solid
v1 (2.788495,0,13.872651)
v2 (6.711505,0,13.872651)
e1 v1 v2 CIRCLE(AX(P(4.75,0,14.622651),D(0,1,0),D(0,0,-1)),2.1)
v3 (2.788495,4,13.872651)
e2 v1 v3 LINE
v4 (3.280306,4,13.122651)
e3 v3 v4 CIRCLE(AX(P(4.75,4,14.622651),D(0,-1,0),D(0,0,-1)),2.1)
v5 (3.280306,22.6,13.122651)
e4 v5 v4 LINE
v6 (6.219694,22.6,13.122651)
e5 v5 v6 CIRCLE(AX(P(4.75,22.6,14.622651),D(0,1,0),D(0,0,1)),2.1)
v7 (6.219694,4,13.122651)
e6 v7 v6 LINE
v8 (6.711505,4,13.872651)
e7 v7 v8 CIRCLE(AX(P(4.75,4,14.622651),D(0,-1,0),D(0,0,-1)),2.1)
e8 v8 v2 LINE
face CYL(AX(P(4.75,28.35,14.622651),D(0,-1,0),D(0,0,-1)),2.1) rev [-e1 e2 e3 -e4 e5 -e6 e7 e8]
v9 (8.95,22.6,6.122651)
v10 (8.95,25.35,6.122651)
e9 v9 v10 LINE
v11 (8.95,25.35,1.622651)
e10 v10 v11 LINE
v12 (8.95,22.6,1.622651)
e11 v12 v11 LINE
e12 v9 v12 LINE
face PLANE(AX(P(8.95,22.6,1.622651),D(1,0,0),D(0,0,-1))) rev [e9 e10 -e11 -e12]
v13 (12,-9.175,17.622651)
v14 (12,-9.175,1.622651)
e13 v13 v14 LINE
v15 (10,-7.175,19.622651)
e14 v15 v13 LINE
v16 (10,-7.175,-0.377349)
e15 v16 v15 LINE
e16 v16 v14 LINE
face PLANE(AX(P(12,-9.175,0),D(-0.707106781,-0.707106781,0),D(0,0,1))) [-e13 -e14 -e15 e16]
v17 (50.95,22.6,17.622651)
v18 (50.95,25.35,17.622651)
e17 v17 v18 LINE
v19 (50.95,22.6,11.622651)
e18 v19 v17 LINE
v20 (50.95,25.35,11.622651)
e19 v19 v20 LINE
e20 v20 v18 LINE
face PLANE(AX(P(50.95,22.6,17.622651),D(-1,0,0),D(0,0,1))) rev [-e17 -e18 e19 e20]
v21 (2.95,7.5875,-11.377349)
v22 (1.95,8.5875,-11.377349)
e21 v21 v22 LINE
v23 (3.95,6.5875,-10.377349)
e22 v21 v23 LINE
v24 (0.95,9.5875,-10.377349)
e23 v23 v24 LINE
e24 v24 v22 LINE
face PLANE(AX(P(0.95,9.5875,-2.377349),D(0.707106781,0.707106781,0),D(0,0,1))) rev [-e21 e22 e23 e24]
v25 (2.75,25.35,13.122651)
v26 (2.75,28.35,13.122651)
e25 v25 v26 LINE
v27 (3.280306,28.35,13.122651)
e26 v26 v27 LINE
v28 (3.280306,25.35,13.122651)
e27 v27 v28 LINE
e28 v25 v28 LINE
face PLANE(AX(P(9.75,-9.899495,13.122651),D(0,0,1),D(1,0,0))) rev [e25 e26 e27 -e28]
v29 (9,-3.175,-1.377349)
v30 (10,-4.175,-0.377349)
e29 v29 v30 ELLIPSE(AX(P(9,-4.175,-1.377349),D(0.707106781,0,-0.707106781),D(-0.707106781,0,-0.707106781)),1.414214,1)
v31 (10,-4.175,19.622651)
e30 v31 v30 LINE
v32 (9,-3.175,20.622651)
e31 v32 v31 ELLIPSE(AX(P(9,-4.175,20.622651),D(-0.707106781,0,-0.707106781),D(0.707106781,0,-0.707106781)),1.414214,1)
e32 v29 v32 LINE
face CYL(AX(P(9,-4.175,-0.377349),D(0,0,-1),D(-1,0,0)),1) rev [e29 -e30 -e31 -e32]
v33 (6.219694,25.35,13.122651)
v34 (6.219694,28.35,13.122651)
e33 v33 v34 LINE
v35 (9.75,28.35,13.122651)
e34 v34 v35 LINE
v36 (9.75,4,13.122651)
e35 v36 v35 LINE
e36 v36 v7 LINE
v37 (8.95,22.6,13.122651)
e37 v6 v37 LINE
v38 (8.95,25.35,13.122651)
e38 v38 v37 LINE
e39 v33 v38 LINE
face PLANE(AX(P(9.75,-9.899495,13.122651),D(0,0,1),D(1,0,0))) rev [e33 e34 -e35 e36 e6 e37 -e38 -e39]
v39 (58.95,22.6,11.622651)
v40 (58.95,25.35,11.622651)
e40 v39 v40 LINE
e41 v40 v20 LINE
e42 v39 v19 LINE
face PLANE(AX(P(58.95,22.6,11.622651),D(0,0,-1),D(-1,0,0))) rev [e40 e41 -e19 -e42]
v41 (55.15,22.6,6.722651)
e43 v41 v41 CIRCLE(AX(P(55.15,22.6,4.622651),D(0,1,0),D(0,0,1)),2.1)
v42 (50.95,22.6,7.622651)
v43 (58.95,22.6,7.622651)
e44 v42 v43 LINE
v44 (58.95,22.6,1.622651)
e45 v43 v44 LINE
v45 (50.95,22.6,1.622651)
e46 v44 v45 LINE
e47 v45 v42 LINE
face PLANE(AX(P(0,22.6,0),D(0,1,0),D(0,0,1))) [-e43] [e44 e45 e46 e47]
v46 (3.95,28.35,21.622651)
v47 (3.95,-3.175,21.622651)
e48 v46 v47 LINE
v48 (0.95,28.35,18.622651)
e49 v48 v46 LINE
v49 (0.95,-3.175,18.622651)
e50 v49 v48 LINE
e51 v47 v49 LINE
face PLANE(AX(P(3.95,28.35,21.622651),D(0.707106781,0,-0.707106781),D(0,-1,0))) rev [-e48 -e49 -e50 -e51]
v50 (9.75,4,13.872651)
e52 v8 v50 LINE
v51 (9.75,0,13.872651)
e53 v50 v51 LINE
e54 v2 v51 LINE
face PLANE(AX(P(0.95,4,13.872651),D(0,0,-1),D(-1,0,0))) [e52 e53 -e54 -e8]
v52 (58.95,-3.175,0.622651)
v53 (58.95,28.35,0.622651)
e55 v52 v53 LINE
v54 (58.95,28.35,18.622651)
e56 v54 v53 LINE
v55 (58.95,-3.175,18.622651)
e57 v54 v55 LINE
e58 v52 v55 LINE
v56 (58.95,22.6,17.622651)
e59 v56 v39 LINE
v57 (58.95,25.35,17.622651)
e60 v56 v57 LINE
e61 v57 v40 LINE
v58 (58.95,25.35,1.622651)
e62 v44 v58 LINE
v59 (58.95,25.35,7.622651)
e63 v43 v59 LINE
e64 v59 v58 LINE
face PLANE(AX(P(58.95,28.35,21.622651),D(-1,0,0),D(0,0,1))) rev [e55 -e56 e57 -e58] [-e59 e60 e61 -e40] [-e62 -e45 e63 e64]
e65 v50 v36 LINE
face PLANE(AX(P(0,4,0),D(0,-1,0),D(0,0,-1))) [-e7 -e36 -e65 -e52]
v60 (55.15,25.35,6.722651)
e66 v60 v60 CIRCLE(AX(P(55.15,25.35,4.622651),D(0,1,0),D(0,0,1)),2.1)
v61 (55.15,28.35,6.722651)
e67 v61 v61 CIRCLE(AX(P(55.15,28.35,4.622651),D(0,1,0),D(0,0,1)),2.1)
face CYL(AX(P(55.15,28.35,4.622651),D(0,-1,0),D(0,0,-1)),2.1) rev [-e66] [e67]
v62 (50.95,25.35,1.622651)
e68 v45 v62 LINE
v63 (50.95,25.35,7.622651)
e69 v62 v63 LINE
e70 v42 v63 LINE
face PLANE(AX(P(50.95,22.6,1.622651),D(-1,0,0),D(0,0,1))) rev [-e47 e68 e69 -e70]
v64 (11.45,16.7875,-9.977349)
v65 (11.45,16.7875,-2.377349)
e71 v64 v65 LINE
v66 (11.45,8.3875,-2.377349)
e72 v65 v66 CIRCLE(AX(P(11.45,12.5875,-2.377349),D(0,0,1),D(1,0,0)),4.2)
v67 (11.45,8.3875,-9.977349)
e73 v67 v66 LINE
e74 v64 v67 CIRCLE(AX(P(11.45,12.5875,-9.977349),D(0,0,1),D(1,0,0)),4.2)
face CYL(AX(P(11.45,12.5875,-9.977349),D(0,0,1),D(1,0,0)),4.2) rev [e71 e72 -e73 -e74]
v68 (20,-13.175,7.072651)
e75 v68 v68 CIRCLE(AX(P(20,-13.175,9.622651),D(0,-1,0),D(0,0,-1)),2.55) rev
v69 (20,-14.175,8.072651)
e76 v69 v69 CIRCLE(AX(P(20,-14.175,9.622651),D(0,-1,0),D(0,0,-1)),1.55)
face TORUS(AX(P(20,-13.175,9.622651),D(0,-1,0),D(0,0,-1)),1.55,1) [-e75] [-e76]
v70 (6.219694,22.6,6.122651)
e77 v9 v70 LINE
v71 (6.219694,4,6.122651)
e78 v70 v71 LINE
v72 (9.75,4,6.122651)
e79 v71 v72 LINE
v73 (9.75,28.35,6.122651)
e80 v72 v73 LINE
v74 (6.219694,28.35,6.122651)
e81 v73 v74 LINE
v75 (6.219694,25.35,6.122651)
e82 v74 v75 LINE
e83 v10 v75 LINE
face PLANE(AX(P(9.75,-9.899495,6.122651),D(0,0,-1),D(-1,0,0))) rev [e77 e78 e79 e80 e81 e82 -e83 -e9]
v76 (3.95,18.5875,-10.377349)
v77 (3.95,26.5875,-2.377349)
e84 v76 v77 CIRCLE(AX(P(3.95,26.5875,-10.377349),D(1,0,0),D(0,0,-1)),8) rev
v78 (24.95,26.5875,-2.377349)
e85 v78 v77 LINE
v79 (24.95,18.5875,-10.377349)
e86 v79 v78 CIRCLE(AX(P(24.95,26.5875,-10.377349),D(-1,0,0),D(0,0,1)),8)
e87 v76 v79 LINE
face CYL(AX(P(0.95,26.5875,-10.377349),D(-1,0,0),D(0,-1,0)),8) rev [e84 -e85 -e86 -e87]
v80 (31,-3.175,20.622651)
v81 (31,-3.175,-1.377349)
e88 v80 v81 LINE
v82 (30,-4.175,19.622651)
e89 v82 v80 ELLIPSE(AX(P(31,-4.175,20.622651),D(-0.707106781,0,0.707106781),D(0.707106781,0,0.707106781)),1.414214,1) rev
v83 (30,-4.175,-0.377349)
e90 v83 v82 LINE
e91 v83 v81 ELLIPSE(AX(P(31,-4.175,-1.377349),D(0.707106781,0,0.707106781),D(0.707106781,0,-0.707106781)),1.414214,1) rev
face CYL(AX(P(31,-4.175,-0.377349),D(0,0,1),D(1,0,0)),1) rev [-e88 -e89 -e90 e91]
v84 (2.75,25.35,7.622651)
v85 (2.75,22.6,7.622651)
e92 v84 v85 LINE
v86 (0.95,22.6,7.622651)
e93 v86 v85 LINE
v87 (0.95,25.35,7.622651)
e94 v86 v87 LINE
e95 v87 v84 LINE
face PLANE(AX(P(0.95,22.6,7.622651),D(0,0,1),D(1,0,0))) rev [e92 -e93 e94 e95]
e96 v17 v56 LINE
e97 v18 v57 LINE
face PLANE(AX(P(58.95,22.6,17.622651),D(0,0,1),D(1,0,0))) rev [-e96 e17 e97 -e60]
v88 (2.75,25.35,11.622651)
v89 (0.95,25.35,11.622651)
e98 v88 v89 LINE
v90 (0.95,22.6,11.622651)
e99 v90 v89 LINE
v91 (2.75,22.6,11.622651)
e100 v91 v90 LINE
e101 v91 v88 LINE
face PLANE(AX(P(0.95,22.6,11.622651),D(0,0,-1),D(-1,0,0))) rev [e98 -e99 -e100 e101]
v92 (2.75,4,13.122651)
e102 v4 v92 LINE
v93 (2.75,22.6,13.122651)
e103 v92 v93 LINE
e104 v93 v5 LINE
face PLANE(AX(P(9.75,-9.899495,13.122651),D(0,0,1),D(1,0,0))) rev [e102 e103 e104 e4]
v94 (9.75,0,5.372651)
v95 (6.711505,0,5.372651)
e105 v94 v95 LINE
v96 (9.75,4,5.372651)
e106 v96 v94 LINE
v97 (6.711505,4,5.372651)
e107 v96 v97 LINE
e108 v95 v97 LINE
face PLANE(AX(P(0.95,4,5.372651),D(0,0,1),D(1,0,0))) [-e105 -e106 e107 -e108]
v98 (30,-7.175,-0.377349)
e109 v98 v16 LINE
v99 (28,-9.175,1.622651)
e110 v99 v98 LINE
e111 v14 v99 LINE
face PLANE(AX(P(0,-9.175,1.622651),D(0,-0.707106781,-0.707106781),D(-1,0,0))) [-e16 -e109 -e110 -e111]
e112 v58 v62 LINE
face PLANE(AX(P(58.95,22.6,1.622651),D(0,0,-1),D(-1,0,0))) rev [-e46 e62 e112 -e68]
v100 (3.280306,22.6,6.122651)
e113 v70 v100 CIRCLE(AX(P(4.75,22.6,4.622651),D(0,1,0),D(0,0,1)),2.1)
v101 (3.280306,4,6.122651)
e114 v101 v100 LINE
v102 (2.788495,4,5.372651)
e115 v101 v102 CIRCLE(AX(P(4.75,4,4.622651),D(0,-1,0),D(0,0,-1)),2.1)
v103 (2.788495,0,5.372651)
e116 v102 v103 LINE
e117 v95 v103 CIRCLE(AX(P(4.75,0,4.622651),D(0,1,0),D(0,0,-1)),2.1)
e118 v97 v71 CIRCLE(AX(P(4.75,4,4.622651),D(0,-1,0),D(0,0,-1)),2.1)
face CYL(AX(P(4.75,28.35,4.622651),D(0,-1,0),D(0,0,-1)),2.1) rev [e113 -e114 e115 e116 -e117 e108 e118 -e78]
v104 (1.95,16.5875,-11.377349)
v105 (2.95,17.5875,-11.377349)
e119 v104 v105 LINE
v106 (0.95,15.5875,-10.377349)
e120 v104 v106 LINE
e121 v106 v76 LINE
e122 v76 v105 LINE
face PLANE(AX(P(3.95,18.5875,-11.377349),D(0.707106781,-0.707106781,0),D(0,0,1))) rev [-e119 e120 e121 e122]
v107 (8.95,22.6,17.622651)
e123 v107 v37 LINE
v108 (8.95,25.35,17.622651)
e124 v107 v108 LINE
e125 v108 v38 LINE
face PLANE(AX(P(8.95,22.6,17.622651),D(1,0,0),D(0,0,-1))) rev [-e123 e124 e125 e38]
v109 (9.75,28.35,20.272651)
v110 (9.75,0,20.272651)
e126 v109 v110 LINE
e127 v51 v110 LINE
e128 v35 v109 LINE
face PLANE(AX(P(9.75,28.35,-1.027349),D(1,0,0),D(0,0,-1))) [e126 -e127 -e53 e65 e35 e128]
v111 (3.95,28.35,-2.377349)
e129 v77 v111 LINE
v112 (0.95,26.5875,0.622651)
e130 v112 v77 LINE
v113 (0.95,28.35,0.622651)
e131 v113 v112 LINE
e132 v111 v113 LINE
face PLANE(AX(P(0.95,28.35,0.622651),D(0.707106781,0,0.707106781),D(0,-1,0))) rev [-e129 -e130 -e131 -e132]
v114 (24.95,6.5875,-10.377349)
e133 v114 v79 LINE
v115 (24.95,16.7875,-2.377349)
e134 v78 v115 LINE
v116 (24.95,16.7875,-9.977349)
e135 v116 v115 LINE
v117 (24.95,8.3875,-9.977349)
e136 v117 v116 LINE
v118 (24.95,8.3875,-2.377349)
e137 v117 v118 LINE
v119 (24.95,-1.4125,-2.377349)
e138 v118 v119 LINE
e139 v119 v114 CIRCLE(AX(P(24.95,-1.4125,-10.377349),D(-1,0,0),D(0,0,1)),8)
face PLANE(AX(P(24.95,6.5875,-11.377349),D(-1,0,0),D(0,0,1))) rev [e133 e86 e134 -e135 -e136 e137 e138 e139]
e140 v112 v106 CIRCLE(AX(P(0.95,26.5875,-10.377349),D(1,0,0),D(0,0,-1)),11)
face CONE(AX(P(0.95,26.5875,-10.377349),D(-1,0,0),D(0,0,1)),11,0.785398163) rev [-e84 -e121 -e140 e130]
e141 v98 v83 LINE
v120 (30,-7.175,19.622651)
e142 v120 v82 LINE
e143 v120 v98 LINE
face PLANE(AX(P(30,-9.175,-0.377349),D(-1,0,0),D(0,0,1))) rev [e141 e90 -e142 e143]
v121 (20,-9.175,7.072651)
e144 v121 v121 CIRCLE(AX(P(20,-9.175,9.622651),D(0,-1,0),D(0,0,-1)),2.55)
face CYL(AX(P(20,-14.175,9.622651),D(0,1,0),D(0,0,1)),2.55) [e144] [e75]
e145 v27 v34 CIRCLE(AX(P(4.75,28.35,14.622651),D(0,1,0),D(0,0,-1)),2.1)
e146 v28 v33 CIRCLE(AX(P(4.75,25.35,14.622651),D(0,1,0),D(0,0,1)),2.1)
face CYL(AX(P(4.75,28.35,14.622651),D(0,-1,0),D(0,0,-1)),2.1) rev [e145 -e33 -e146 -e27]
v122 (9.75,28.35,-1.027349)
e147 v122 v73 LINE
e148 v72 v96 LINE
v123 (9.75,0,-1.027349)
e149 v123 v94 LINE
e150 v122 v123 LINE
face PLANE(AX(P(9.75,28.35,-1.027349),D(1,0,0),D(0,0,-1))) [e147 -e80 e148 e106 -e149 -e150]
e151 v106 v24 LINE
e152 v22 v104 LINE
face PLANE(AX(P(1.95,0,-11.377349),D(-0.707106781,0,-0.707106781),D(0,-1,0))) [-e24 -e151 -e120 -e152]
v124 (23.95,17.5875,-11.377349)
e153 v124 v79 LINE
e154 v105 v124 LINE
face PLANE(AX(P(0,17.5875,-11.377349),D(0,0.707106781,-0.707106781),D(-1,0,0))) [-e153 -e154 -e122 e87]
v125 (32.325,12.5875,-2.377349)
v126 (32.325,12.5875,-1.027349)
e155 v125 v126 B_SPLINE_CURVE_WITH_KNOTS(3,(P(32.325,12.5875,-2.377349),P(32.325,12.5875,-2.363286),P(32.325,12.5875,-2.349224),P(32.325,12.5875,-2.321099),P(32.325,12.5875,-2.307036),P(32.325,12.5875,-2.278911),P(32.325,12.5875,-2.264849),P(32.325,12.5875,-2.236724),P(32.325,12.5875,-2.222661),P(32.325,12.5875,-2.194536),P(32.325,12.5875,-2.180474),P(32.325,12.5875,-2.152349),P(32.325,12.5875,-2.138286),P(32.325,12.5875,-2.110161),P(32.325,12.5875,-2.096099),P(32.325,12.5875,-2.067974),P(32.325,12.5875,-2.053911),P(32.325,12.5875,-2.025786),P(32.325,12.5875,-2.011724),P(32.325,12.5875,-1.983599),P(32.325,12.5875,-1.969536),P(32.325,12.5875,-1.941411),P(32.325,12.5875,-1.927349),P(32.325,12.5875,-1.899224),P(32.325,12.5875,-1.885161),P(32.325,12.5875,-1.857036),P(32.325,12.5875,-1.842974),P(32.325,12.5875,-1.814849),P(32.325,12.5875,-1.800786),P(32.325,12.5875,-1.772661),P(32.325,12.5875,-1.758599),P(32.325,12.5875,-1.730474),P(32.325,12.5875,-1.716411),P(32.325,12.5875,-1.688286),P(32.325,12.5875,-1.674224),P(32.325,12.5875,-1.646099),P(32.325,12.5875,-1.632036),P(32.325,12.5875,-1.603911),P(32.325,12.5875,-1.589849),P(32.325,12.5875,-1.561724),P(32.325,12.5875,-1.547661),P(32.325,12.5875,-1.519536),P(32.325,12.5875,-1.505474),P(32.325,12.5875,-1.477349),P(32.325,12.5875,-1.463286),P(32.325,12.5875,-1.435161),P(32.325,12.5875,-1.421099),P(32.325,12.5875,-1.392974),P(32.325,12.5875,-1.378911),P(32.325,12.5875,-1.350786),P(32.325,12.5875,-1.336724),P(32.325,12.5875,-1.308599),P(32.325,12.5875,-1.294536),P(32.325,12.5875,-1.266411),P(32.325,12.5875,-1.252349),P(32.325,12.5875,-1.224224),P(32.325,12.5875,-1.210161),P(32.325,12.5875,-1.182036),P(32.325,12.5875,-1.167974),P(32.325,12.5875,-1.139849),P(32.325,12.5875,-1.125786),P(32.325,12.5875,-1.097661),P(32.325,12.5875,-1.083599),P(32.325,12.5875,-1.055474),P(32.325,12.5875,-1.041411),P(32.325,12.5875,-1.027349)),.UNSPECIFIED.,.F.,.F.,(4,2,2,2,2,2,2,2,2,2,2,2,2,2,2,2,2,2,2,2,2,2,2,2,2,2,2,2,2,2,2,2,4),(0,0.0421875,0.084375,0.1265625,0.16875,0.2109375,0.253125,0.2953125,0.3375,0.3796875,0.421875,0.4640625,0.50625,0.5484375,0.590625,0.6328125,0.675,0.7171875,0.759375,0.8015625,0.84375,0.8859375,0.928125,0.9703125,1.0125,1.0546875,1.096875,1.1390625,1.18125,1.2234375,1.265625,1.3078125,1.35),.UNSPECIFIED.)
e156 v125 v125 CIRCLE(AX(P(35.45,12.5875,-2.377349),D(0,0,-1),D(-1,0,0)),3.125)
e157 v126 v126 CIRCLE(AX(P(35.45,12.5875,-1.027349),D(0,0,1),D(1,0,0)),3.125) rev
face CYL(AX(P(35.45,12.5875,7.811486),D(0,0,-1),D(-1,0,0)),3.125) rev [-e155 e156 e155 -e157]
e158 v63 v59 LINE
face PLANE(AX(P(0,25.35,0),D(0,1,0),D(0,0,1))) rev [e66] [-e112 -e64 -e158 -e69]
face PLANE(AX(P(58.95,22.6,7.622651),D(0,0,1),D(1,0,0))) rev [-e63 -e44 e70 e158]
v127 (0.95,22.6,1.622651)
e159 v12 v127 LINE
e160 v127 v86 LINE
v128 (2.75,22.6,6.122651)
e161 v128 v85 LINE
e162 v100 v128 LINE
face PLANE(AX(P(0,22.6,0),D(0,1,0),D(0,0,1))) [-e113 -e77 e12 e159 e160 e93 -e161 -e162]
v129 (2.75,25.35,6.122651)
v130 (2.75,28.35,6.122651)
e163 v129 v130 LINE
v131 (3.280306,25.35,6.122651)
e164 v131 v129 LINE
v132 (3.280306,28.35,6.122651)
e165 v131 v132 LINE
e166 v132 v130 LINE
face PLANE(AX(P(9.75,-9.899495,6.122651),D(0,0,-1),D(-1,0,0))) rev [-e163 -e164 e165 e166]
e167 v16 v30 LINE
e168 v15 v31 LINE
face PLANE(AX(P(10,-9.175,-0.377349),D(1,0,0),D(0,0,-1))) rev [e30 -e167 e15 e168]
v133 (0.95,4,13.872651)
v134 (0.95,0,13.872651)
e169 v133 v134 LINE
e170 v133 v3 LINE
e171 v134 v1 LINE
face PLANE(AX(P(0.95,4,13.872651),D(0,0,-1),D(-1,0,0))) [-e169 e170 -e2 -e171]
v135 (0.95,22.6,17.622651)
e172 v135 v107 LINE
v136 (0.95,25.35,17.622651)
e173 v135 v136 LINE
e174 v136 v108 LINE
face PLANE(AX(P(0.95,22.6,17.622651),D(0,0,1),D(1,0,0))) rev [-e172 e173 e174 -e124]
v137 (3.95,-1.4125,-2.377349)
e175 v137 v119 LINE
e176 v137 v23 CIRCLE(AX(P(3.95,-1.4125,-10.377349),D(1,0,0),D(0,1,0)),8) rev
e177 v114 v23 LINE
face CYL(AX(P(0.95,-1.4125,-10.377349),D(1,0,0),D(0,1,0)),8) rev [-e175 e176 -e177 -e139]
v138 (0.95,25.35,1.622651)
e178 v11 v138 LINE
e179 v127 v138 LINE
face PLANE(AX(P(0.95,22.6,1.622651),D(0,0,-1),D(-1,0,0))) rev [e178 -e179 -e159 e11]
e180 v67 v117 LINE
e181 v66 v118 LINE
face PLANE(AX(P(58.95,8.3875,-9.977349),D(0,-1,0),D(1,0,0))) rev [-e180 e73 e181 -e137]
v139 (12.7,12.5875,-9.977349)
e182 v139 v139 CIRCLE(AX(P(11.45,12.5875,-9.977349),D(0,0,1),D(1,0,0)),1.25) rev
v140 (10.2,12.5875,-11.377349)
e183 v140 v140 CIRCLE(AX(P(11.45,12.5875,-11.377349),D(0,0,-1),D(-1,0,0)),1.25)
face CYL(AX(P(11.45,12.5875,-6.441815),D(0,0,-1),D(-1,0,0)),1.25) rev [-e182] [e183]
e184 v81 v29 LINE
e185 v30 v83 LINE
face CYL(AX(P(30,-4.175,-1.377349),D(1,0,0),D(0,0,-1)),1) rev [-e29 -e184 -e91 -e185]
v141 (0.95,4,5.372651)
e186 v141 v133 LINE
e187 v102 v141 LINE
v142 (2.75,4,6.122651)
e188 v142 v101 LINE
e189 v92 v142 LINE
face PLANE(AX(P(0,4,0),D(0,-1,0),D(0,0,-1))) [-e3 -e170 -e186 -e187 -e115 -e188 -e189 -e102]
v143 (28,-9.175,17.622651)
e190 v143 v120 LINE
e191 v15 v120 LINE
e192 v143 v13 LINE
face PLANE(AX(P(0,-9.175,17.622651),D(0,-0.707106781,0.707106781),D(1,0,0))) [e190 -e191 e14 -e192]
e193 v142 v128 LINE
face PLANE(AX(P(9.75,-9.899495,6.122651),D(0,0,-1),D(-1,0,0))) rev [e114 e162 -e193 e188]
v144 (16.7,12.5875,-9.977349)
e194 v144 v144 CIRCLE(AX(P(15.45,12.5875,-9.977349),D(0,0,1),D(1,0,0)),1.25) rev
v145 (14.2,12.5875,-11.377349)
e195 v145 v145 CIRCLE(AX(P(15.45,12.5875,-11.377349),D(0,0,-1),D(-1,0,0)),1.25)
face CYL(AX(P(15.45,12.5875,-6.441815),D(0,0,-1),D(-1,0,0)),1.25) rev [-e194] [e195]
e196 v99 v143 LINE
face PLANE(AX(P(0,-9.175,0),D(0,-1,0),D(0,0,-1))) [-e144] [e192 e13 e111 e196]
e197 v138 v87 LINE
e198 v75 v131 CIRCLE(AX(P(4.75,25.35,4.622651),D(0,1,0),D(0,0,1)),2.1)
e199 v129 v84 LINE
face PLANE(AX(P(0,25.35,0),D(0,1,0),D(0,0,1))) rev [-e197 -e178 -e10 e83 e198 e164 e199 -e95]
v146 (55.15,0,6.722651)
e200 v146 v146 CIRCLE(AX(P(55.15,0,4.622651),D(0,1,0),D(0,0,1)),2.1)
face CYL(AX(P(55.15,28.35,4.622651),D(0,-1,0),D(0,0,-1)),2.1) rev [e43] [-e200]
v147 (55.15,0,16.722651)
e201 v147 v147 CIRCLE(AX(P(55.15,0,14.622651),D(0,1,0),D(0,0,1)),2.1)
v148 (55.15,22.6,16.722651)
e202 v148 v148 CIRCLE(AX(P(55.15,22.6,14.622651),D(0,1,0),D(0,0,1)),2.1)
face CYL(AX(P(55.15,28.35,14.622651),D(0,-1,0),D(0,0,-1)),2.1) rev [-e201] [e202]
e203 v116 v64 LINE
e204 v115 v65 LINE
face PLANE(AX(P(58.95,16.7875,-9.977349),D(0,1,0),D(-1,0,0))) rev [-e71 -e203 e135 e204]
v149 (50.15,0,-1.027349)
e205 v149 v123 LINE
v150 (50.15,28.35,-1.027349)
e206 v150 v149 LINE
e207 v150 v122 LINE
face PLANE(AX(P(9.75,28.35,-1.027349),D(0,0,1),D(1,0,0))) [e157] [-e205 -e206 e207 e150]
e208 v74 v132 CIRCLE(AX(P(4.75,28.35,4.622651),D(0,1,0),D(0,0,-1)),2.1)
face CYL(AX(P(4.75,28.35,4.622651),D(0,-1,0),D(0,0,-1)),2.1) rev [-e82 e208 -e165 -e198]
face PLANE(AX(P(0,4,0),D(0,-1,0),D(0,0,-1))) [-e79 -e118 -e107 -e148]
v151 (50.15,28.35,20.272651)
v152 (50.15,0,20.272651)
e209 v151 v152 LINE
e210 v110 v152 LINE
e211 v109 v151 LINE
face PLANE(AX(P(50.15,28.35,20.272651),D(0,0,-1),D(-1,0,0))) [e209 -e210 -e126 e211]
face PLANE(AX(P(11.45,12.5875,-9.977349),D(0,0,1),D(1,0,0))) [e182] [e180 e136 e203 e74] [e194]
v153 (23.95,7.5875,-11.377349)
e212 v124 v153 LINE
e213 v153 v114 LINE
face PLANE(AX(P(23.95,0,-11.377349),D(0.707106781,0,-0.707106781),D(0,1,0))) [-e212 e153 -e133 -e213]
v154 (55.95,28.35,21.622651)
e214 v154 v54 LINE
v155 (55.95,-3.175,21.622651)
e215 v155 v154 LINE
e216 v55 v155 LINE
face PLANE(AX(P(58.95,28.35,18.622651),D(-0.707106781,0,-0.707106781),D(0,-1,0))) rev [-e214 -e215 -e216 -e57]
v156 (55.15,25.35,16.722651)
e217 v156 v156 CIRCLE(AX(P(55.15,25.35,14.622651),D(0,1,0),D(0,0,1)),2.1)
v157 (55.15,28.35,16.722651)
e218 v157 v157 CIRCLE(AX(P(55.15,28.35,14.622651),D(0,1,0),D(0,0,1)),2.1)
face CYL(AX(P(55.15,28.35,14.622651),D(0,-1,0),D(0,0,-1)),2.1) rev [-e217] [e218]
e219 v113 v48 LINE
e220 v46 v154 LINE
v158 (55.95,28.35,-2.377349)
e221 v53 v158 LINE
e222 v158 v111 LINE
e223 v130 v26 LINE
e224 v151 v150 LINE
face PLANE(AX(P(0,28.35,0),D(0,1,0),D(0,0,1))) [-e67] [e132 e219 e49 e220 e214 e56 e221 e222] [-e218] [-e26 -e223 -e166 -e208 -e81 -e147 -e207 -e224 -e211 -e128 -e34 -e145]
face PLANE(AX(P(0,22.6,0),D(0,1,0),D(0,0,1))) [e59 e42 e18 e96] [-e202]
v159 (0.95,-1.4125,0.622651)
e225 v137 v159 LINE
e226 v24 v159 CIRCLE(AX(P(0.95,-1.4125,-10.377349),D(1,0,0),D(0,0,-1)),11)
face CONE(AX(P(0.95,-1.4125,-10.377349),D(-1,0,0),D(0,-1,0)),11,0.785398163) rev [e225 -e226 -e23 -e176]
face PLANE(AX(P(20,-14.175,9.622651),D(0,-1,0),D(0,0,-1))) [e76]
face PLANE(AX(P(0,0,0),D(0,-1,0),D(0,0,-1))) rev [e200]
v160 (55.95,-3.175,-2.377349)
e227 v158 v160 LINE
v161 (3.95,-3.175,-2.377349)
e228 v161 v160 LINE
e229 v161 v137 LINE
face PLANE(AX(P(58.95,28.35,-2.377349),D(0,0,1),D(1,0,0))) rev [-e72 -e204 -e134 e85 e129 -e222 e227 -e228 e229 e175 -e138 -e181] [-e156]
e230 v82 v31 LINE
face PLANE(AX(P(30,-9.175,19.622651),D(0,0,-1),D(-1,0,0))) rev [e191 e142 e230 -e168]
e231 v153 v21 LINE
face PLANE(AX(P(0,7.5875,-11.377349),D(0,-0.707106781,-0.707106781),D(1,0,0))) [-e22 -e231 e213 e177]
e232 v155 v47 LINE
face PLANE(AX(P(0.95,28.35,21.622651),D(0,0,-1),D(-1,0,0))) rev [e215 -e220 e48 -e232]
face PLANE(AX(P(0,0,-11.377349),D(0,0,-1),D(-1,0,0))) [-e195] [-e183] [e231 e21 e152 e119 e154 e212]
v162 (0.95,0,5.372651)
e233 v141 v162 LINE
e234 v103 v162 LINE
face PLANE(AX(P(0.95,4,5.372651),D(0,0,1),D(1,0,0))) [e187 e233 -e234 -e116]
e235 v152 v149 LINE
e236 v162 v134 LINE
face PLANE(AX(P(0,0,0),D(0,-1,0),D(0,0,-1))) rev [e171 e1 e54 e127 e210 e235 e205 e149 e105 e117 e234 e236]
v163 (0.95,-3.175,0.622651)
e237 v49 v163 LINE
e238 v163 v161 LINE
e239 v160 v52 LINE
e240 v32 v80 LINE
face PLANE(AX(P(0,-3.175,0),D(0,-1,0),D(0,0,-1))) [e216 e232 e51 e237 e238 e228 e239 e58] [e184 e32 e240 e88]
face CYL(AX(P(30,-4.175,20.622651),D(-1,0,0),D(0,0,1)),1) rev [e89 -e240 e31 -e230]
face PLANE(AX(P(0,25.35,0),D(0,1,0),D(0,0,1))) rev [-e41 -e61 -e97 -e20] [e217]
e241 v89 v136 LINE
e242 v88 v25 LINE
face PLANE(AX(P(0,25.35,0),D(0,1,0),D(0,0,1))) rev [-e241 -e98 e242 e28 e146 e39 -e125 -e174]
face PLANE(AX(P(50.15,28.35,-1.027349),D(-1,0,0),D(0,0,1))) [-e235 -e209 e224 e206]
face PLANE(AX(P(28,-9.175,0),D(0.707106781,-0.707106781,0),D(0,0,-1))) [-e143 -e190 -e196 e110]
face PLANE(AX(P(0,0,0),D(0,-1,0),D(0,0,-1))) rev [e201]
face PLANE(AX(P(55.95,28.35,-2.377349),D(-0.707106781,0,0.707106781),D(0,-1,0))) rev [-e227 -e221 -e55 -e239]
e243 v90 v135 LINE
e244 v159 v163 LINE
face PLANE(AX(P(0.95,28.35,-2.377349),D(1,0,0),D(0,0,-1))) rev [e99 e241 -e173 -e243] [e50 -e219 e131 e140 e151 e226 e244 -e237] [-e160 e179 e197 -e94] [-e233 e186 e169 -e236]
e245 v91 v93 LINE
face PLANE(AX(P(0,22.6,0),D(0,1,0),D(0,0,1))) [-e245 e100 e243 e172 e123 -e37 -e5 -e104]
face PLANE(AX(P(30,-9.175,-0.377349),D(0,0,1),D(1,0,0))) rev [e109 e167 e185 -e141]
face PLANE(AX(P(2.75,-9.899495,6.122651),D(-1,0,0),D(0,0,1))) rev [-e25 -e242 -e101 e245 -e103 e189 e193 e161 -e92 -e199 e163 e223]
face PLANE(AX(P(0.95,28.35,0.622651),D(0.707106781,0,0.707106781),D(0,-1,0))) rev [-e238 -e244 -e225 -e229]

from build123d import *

# Parameters (mm, degrees)
SKETCH1_W           = 58
SKETCH1_H           = 24
SKETCH1_R           = 2.1
SKETCH1_W_2         = 40.4
SKETCH1_H_2         = 21.3
BOSS_EXTRUDE1_DEPTH = 28.35
SKETCH11_W          = 58
SKETCH11_H          = 24
BOSS_EXTRUDE5_DEPTH = 3.175
SKETCH14_W          = 24
SKETCH14_H          = 12
BOSS_EXTRUDE7_DEPTH = 9
CUT_EXTRUDE1_START  = -4.5
CUT_EXTRUDE1_DEPTH  = 7.6
FILLET1_R           = 8
CHAMFER2_SIZE       = 3
CHAMFER3_SIZE       = 1
SKETCH19_W          = 8
SKETCH19_H          = 6
CUT_EXTRUDE3_DEPTH  = 2.75
SKETCH20_W          = 8.8
SKETCH20_H          = 8.5
CUT_EXTRUDE4_DEPTH  = 4
SKETCH21_W          = 20
SKETCH21_H          = 20
BOSS_EXTRUDE8_DEPTH = 6
SKETCH13_R          = 2.55
BOSS_EXTRUDE6_DEPTH = 5
FILLET4_R           = 1
CHAMFER4_SIZE       = 2
FILLET5_R           = 1
CUT_EXTRUDE5_REACH  = 77.835
SKETCH22_W          = 7
SKETCH22_H          = 7
CUT_EXTRUDE6_DEPTH  = 1.4
SKETCH24_R          = 3.125
CUT_EXTRUDE7_DEPTH  = 1.35


with BuildPart() as part:
    # Sketch1 → Boss-Extrude1 (new body)
    with BuildSketch(Plane(origin=(0, 0, 0), x_dir=(1, 0, 0), z_dir=(0, 1, 0))):
        with Locations((29.95, -9.622651473)):
            Rectangle(SKETCH1_W, SKETCH1_H)
        with Locations(Location((55.15, -4.622651473, 0), (0, 0, 270))):
            Circle(SKETCH1_R, mode=Mode.SUBTRACT)
        with Locations(Location((55.15, -14.622651473, 0), (0, 0, 270))):
            Circle(SKETCH1_R, mode=Mode.SUBTRACT)
        with Locations(Location((4.75, -14.622651473, 0), (0, 0, 90))):
            Circle(SKETCH1_R, mode=Mode.SUBTRACT)
        with Locations(Location((4.75, -4.622651473, 0), (0, 0, 90))):
            Circle(SKETCH1_R, mode=Mode.SUBTRACT)
        with Locations((29.95, -9.622651473)):
            Rectangle(SKETCH1_W_2, SKETCH1_H_2, mode=Mode.SUBTRACT)
    extrude(amount=BOSS_EXTRUDE1_DEPTH)

    # Sketch11 → Boss-Extrude5 (add)
    with BuildSketch(Plane.XZ):
        with Locations((29.95, 9.622651473)):
            Rectangle(SKETCH11_W, SKETCH11_H)
    extrude(amount=BOSS_EXTRUDE5_DEPTH)

    # Sketch14 → Boss-Extrude7 (add)
    with BuildSketch(Plane(origin=(0, 0, -2.377348527), x_dir=(-1, 0, 0), z_dir=(0, 0, -1))):
        with Locations((-12.95, 12.5875)):
            Rectangle(SKETCH14_W, SKETCH14_H)
    extrude(amount=BOSS_EXTRUDE7_DEPTH)

    # Sketch16 → Cut-Extrude1 (cut)
    with BuildSketch(Plane(origin=(0, 0, -6.877348527), x_dir=(-1, 0, 0), z_dir=(0, 0, -1)).offset(CUT_EXTRUDE1_START)):
        with BuildLine():
            Line((-11.45, 16.7875), (-24.95, 16.7875))
            Line((-24.95, 16.7875), (-24.95, 8.3875))
            Line((-24.95, 8.3875), (-11.45, 8.3875))
            ThreePointArc((-11.45, 8.3875), (-7.25, 12.5875), (-11.45, 16.7875))
        make_face()
    extrude(amount=CUT_EXTRUDE1_DEPTH, mode=Mode.SUBTRACT)

    # Fillet1
    fillet1_edges = [part.edges().sort_by_distance(p)[0] for p in [
        (12.95, 6.5875, -2.377348527),
        (12.95, 18.5875, -2.377348527),
    ]]
    fillet(fillet1_edges, radius=FILLET1_R)

    # Chamfer2
    chamfer2_edges = [part.edges().sort_by_distance(p)[0] for p in [
        (0.95, 6.5875, -10.877348527),
        (0.95, 18.5875, -10.877348527),
        (58.95, 12.5875, 21.622651473),
        (0.95, 12.5875, 21.622651473),
        (0.95, 27.46875, -2.377348527),
        (58.95, 12.5875, -2.377348527),
        (0.95, -2.29375, -2.377348527),
        (0.95, 4.244354249, -4.720494277),
        (0.95, 20.930645751, -4.720494277),
    ]]
    chamfer(chamfer2_edges, length=CHAMFER2_SIZE)

    # Chamfer3
    chamfer3_edges = [part.edges().sort_by_distance(p)[0] for p in [
        (14.45, 6.5875, -11.377348527),
        (24.95, 12.5875, -11.377348527),
        (14.45, 18.5875, -11.377348527),
        (0.95, 12.5875, -11.377348527),
    ]]
    chamfer(chamfer3_edges, length=CHAMFER3_SIZE - 0.0001)  # a hair under: the kernel refuses the full size

    # Sketch19 → Cut-Extrude3 (cut)
    with BuildSketch(Plane(origin=(0, 25.35, 0), x_dir=(1, 0, 0), z_dir=(0, 1, 0))):
        with Locations((4.95, -4.622651473)):
            Rectangle(SKETCH19_W, SKETCH19_H)
        with Locations((4.95, -14.622651473)):
            Rectangle(SKETCH19_W, SKETCH19_H)
        with Locations((54.95, -14.622651473)):
            Rectangle(SKETCH19_W, SKETCH19_H)
        with Locations((54.95, -4.622651473)):
            Rectangle(SKETCH19_W, SKETCH19_H)
    extrude(amount=-CUT_EXTRUDE3_DEPTH, mode=Mode.SUBTRACT)

    # Sketch20 → Cut-Extrude4 (cut)
    with BuildSketch(Plane(origin=(0, 0, 0), x_dir=(1, 0, 0), z_dir=(0, 1, 0))):
        with Locations((5.35, -9.622651473)):
            Rectangle(SKETCH20_W, SKETCH20_H)
    extrude(amount=CUT_EXTRUDE4_DEPTH, mode=Mode.SUBTRACT)

    # Sketch21 → Boss-Extrude8 (add)
    with BuildSketch(Plane.XZ.offset(3.175)):
        with Locations((20, 9.622651473)):
            Rectangle(SKETCH21_W, SKETCH21_H)
    extrude(amount=BOSS_EXTRUDE8_DEPTH)

    # Sketch13 → Boss-Extrude6 (add)
    with BuildSketch(Plane.XZ.offset(9.175)):
        with Locations(Location((20, 9.622651473, 0), (0, 0, 270))):
            Circle(SKETCH13_R)
    extrude(amount=BOSS_EXTRUDE6_DEPTH)

    # Fillet4
    fillet4_edges = [part.edges().sort_by_distance(p)[0] for p in [
        (10, -3.175, 9.622651473),
        (20, -3.175, -0.377348527),
        (30, -3.175, 9.622651473),
        (20, -3.175, 19.622651473),
    ]]
    fillet(fillet4_edges, radius=FILLET4_R)

    # Chamfer4
    chamfer4_edges = [part.edges().sort_by_distance(p)[0] for p in [
        (10, -9.175, 9.622651473),
        (20, -9.175, -0.377348527),
        (30, -9.175, 9.622651473),
        (20, -9.175, 19.622651473),
    ]]
    chamfer(chamfer4_edges, length=CHAMFER4_SIZE)

    # Fillet5
    fillet5_edges = [part.edges().sort_by_distance(p)[0] for p in [
        (20, -14.175, 12.172651473),
    ]]
    fillet(fillet5_edges, radius=FILLET5_R)

    # Cut-Extrude5: up to this face of the body (flat: up to its plane)
    cut_extrude5_end = Plane(part.part.faces().sort_by_distance((27.49586415, 0, 9.622651473))[0])
    # Sketch22 → Cut-Extrude5 (cut, up to the picked face)
    with BuildSketch(Plane(origin=(0, 28.35, 0), x_dir=(1, 0, 0), z_dir=(0, 1, 0)), mode=Mode.PRIVATE) as cut_extrude5_sk1:
        with Locations((6.25, -9.622651473)):
            Rectangle(SKETCH22_W, SKETCH22_H)
    cut_extrude5_tool1 = split(extrude(cut_extrude5_sk1.sketch, amount=-CUT_EXTRUDE5_REACH, mode=Mode.PRIVATE), bisect_by=cut_extrude5_end, keep=Keep.BOTH, mode=Mode.PRIVATE)
    add(cut_extrude5_tool1.solids().sort_by(Axis((6.25, 28.35, 9.622651), (0, -1, 0)))[0], mode=Mode.SUBTRACT)

    # Sketch23 → Cut-Extrude6 (cut)
    with BuildSketch(Plane(origin=(0, 0, -11.377348527), x_dir=(-1, 0, 0), z_dir=(0, 0, -1))):
        with BuildLine():
            ThreePointArc((-10.2, 12.5875), (-11.45, 13.8375), (-12.7, 12.5875))
            ThreePointArc((-12.7, 12.5875), (-11.45, 11.3375), (-10.2, 12.5875))
        make_face()
        with BuildLine():
            ThreePointArc((-14.2, 12.5875), (-15.45, 13.8375), (-16.7, 12.5875))
            ThreePointArc((-16.7, 12.5875), (-15.45, 11.3375), (-14.2, 12.5875))
        make_face()
    extrude(amount=-CUT_EXTRUDE6_DEPTH, mode=Mode.SUBTRACT)

    # Sketch24 → Cut-Extrude7 (cut)
    with BuildSketch(Plane(origin=(0, 0, -2.377348527), x_dir=(-1, 0, 0), z_dir=(0, 0, -1))):
        with Locations((-35.45, 12.5875)):
            Circle(SKETCH24_R)
    extrude(amount=-CUT_EXTRUDE7_DEPTH, mode=Mode.SUBTRACT)


solid = part.part
